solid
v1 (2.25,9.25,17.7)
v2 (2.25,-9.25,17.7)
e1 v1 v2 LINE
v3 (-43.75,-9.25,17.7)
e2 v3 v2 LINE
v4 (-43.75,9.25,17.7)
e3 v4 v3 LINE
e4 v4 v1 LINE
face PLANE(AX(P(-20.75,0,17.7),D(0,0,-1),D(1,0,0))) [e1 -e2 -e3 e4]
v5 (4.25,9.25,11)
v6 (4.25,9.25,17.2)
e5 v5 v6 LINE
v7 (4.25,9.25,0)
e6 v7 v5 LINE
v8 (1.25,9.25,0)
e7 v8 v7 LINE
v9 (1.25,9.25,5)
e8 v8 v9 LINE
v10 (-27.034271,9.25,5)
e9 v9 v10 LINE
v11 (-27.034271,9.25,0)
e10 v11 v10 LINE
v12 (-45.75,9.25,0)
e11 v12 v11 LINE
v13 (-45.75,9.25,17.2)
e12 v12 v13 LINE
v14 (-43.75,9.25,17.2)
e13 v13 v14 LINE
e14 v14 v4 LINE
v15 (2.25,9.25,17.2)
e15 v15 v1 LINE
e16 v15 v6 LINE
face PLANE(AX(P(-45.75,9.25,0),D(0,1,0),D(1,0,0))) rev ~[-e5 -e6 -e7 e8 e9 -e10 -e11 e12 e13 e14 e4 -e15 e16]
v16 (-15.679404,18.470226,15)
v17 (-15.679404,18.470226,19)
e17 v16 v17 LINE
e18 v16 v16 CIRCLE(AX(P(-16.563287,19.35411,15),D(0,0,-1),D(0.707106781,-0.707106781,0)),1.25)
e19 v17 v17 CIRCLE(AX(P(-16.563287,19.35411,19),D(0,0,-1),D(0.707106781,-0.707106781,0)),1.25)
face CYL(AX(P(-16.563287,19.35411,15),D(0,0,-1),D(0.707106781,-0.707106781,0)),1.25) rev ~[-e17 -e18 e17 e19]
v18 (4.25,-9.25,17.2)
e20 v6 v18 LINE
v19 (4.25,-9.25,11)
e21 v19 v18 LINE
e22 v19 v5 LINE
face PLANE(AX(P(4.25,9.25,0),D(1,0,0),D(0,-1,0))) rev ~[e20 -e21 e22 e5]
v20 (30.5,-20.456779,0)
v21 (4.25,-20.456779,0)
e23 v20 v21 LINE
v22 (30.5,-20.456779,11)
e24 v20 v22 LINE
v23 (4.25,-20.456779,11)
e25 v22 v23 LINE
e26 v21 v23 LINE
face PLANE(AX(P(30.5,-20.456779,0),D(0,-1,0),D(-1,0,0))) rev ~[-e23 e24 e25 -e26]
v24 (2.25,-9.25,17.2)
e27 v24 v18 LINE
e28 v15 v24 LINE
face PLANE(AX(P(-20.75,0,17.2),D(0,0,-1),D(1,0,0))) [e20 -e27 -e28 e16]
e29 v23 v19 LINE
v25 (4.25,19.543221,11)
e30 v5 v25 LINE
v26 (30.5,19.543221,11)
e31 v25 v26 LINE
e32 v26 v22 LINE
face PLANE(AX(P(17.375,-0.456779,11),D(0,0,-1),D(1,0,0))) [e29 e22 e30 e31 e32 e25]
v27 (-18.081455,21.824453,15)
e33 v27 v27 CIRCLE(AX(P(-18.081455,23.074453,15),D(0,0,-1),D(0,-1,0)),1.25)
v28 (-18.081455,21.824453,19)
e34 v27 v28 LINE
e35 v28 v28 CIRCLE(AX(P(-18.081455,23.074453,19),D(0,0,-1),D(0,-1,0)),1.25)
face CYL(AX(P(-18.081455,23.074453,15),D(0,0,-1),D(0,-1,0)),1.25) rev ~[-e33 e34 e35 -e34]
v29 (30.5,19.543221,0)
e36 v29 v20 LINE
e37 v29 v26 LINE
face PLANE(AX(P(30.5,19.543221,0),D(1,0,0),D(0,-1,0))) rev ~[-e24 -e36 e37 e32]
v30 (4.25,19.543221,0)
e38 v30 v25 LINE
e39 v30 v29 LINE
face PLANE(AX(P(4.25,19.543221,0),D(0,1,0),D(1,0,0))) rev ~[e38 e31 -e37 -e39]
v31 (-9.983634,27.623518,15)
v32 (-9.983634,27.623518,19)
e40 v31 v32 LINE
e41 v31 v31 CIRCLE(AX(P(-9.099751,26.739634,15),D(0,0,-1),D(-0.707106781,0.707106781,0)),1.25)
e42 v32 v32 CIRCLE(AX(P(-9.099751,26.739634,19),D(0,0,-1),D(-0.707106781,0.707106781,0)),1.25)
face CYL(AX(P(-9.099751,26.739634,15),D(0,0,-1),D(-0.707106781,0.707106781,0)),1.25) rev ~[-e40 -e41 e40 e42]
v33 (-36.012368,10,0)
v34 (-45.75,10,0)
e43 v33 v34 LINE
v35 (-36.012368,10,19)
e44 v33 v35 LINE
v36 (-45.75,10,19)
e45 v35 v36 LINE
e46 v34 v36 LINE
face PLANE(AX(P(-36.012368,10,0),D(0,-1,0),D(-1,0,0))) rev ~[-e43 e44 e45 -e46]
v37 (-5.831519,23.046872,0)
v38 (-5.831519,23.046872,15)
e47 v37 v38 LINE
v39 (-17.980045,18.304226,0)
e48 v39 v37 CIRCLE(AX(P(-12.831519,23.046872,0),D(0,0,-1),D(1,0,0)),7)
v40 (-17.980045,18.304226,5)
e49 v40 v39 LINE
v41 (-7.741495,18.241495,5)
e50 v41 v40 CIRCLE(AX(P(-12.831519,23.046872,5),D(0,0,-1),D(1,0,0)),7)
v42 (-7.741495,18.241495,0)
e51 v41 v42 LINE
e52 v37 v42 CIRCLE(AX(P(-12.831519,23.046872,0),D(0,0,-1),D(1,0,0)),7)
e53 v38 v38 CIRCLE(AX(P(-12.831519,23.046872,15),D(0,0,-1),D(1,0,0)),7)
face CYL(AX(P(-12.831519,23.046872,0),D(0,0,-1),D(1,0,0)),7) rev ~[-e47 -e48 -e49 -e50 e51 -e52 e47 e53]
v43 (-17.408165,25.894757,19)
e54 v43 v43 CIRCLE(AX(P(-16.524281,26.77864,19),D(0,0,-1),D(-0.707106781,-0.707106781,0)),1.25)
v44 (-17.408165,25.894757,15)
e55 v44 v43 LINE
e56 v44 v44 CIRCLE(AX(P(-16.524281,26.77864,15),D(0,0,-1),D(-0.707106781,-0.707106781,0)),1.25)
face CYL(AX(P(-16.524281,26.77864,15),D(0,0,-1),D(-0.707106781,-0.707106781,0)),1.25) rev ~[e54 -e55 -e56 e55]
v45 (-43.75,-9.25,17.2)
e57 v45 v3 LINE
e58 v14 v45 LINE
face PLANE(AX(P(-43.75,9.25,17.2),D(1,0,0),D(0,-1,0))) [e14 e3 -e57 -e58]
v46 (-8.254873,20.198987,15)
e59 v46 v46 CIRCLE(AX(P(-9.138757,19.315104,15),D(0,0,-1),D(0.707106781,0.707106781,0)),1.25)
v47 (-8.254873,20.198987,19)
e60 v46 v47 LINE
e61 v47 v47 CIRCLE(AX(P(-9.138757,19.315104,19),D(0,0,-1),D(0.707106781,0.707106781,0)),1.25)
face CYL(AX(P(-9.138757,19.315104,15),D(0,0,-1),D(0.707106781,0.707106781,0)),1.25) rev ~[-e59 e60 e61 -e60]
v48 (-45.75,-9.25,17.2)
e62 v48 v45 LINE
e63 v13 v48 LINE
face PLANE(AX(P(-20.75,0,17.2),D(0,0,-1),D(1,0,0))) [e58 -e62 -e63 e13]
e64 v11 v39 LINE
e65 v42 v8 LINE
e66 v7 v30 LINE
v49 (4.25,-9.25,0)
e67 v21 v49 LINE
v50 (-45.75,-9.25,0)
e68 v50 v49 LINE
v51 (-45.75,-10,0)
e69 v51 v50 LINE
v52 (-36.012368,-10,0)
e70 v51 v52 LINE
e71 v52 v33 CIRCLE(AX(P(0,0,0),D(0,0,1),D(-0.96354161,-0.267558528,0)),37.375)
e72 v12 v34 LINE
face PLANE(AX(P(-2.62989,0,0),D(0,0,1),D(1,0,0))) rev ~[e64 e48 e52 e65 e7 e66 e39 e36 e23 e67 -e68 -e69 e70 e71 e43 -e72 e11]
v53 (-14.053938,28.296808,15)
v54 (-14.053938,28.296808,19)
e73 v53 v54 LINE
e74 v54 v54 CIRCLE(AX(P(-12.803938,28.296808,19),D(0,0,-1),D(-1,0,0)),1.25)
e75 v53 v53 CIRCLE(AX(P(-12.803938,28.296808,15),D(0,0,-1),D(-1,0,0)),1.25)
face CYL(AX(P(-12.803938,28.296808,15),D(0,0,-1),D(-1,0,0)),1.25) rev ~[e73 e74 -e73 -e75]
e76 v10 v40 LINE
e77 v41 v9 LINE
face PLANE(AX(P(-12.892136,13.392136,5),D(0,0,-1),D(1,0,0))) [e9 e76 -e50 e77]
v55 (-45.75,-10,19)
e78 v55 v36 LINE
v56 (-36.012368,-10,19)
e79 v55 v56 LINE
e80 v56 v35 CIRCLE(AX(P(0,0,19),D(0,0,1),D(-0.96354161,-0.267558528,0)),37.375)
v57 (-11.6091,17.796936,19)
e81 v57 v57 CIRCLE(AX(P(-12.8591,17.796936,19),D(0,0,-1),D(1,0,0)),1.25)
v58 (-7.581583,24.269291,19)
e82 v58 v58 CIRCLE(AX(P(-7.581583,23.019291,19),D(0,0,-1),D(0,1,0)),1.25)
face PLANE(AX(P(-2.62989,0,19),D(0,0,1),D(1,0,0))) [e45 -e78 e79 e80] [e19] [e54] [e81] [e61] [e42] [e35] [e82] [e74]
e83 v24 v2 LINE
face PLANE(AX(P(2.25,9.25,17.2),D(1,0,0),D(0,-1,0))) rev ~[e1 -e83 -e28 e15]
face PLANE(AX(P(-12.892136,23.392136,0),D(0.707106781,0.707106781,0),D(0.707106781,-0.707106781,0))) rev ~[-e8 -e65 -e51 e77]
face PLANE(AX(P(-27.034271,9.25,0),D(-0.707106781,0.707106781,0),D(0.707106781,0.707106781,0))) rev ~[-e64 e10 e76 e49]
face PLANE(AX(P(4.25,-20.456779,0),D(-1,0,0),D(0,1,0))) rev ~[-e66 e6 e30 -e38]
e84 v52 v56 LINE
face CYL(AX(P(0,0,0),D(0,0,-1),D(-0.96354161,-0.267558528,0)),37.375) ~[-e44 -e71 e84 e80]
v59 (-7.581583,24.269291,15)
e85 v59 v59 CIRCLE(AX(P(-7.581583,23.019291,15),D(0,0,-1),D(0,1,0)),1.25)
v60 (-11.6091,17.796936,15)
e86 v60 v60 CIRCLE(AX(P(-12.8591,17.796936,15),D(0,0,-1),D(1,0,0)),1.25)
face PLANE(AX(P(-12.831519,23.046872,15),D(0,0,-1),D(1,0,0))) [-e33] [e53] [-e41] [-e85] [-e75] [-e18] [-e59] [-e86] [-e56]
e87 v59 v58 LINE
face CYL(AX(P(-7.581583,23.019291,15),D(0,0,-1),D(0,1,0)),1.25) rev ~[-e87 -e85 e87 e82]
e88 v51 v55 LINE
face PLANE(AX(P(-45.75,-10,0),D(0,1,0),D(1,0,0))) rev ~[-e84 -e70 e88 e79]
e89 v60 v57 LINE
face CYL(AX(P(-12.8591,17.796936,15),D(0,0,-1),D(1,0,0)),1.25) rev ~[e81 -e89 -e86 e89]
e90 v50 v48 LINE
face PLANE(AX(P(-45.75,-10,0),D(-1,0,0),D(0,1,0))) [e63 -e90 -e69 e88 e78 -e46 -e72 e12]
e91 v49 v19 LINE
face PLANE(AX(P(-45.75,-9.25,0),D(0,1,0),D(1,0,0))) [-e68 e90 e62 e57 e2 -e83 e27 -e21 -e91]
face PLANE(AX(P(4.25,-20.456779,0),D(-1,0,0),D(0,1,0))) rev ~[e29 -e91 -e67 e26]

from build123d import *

# Parameters (mm, degrees)
F0_W             = 1
F0_H             = 20
F1_DEPTH         = 19
F2_W             = 50
F2_H             = 18.5
F3_DEPTH         = 17.2
F4_W             = 46
F4_H             = 18.5
F5_DEPTH         = 0.5
F7_DEPTH         = 11
F10_DEPTH        = 5
F8_R             = 7
F11_DEPTH        = 15
F12_R            = 1.25
F13_DEPTH        = 4
F13_COPIES_COUNT = 8


# Not quite as in the source:
# - a pattern or mirror of a feature is missing from the dataset's text; its kind, count and spacing are read off the source's solid


with BuildPart() as f1:
    # F0 (on Top) → F1 (new body)
    with BuildSketch(Plane.XY):
        with BuildLine():
            ThreePointArc((-36.0123676672, -10), (5.0462056754, -37.0327751226), (37.375, 0))
            ThreePointArc((37.375, 0), (5.0462056754, 37.0327751226), (-36.0123676672, 10))
            Line((-36.0123676672, 10), (-30, 10))
            Line((-30, 10), (-30, -10))
            Line((-30, -10), (-36.0123676672, -10))
        make_face()
        with BuildLine():
            Line((-30, 10), (-36.0123676672, 10))
            ThreePointArc((-36.0123676672, 10), (-37.375, 0), (-36.0123676672, -10))
            Line((-36.0123676672, -10), (-30, -10))
            Line((-30, -10), (-30, 10))
        make_face()
        with BuildLine():
            ThreePointArc((-36.0123676672, -10), (-37.375, 0), (-36.0123676672, 10))
            Line((-36.0123676672, 10), (-44.75, 10))
            Line((-44.75, 10), (-44.75, -10))
            Line((-44.75, -10), (-36.0123676672, -10))
        make_face()
        with Locations((-45.25, 0)):
            Rectangle(F0_W, F0_H)
    extrude(amount=F1_DEPTH)

    # F2 (on face) → F3 (cut)
    with BuildSketch(Plane(origin=(0, 0, 0), x_dir=(1, 0, 0), z_dir=(0, 0, -1))):
        with Locations((-20.75, 0)):
            Rectangle(F2_W, F2_H)
    extrude(amount=-F3_DEPTH, mode=Mode.SUBTRACT)

    # F4 (on face) → F5 (cut)
    with BuildSketch(Plane(origin=(0, 0, 17.2), x_dir=(1, 0, 0), z_dir=(0, 0, -1))):
        with Locations((-20.75, 0)):
            Rectangle(F4_W, F4_H)
    extrude(amount=-F5_DEPTH, mode=Mode.SUBTRACT)

    # F6 (on face) → F7 (cut)
    with BuildSketch(Plane(origin=(0, 0, 0), x_dir=(1, 0, 0), z_dir=(0, 0, -1))):
        Polygon((30.5, 20.4567786688), (4.25, 20.4567786688), (4.25, 9.25), (4.25, -9.25), (4.25, -19.5432213312), (30.5, -19.5432213312), align=None)
    extrude(amount=-F7_DEPTH, mode=Mode.SUBTRACT)

    # F9 (on face) → F10 (cut)
    with BuildSketch(Plane(origin=(0, 0, 0), x_dir=(1, 0, 0), z_dir=(0, 0, -1))):
        Polygon((-27.0342712475, -9.25), (-12.8921356237, -23.3921356237), (1.25, -9.25), align=None)
    extrude(amount=-F10_DEPTH, mode=Mode.SUBTRACT)

    # F8 (on face) → F11 (cut)
    with BuildSketch(Plane(origin=(0, 0, 0), x_dir=(1, 0, 0), z_dir=(0, 0, -1))):
        with Locations((-12.8315193579, -23.0468716472)):
            Circle(F8_R)
    extrude(amount=-F11_DEPTH, mode=Mode.SUBTRACT)

    # F12 (on face) → F13 (cut)
    with BuildSketch(Plane(origin=(0, 0, 15), x_dir=(1, 0, 0), z_dir=(0, 0, -1))):
        with Locations((-12.8591003243, -17.7969360865)):
            Circle(F12_R)
    f13 = extrude(amount=-F13_DEPTH, mode=Mode.SUBTRACT)

    # F13_copies: F13 ×8 about axis
    f13_copies_axis = Axis((-12.831519, 23.046872, 0), (0, 0, 1))
    for i in range(1, F13_COPIES_COUNT):
        add(f13.rotate(f13_copies_axis, i * 360 / F13_COPIES_COUNT), mode=Mode.SUBTRACT)


solid = f1.part
